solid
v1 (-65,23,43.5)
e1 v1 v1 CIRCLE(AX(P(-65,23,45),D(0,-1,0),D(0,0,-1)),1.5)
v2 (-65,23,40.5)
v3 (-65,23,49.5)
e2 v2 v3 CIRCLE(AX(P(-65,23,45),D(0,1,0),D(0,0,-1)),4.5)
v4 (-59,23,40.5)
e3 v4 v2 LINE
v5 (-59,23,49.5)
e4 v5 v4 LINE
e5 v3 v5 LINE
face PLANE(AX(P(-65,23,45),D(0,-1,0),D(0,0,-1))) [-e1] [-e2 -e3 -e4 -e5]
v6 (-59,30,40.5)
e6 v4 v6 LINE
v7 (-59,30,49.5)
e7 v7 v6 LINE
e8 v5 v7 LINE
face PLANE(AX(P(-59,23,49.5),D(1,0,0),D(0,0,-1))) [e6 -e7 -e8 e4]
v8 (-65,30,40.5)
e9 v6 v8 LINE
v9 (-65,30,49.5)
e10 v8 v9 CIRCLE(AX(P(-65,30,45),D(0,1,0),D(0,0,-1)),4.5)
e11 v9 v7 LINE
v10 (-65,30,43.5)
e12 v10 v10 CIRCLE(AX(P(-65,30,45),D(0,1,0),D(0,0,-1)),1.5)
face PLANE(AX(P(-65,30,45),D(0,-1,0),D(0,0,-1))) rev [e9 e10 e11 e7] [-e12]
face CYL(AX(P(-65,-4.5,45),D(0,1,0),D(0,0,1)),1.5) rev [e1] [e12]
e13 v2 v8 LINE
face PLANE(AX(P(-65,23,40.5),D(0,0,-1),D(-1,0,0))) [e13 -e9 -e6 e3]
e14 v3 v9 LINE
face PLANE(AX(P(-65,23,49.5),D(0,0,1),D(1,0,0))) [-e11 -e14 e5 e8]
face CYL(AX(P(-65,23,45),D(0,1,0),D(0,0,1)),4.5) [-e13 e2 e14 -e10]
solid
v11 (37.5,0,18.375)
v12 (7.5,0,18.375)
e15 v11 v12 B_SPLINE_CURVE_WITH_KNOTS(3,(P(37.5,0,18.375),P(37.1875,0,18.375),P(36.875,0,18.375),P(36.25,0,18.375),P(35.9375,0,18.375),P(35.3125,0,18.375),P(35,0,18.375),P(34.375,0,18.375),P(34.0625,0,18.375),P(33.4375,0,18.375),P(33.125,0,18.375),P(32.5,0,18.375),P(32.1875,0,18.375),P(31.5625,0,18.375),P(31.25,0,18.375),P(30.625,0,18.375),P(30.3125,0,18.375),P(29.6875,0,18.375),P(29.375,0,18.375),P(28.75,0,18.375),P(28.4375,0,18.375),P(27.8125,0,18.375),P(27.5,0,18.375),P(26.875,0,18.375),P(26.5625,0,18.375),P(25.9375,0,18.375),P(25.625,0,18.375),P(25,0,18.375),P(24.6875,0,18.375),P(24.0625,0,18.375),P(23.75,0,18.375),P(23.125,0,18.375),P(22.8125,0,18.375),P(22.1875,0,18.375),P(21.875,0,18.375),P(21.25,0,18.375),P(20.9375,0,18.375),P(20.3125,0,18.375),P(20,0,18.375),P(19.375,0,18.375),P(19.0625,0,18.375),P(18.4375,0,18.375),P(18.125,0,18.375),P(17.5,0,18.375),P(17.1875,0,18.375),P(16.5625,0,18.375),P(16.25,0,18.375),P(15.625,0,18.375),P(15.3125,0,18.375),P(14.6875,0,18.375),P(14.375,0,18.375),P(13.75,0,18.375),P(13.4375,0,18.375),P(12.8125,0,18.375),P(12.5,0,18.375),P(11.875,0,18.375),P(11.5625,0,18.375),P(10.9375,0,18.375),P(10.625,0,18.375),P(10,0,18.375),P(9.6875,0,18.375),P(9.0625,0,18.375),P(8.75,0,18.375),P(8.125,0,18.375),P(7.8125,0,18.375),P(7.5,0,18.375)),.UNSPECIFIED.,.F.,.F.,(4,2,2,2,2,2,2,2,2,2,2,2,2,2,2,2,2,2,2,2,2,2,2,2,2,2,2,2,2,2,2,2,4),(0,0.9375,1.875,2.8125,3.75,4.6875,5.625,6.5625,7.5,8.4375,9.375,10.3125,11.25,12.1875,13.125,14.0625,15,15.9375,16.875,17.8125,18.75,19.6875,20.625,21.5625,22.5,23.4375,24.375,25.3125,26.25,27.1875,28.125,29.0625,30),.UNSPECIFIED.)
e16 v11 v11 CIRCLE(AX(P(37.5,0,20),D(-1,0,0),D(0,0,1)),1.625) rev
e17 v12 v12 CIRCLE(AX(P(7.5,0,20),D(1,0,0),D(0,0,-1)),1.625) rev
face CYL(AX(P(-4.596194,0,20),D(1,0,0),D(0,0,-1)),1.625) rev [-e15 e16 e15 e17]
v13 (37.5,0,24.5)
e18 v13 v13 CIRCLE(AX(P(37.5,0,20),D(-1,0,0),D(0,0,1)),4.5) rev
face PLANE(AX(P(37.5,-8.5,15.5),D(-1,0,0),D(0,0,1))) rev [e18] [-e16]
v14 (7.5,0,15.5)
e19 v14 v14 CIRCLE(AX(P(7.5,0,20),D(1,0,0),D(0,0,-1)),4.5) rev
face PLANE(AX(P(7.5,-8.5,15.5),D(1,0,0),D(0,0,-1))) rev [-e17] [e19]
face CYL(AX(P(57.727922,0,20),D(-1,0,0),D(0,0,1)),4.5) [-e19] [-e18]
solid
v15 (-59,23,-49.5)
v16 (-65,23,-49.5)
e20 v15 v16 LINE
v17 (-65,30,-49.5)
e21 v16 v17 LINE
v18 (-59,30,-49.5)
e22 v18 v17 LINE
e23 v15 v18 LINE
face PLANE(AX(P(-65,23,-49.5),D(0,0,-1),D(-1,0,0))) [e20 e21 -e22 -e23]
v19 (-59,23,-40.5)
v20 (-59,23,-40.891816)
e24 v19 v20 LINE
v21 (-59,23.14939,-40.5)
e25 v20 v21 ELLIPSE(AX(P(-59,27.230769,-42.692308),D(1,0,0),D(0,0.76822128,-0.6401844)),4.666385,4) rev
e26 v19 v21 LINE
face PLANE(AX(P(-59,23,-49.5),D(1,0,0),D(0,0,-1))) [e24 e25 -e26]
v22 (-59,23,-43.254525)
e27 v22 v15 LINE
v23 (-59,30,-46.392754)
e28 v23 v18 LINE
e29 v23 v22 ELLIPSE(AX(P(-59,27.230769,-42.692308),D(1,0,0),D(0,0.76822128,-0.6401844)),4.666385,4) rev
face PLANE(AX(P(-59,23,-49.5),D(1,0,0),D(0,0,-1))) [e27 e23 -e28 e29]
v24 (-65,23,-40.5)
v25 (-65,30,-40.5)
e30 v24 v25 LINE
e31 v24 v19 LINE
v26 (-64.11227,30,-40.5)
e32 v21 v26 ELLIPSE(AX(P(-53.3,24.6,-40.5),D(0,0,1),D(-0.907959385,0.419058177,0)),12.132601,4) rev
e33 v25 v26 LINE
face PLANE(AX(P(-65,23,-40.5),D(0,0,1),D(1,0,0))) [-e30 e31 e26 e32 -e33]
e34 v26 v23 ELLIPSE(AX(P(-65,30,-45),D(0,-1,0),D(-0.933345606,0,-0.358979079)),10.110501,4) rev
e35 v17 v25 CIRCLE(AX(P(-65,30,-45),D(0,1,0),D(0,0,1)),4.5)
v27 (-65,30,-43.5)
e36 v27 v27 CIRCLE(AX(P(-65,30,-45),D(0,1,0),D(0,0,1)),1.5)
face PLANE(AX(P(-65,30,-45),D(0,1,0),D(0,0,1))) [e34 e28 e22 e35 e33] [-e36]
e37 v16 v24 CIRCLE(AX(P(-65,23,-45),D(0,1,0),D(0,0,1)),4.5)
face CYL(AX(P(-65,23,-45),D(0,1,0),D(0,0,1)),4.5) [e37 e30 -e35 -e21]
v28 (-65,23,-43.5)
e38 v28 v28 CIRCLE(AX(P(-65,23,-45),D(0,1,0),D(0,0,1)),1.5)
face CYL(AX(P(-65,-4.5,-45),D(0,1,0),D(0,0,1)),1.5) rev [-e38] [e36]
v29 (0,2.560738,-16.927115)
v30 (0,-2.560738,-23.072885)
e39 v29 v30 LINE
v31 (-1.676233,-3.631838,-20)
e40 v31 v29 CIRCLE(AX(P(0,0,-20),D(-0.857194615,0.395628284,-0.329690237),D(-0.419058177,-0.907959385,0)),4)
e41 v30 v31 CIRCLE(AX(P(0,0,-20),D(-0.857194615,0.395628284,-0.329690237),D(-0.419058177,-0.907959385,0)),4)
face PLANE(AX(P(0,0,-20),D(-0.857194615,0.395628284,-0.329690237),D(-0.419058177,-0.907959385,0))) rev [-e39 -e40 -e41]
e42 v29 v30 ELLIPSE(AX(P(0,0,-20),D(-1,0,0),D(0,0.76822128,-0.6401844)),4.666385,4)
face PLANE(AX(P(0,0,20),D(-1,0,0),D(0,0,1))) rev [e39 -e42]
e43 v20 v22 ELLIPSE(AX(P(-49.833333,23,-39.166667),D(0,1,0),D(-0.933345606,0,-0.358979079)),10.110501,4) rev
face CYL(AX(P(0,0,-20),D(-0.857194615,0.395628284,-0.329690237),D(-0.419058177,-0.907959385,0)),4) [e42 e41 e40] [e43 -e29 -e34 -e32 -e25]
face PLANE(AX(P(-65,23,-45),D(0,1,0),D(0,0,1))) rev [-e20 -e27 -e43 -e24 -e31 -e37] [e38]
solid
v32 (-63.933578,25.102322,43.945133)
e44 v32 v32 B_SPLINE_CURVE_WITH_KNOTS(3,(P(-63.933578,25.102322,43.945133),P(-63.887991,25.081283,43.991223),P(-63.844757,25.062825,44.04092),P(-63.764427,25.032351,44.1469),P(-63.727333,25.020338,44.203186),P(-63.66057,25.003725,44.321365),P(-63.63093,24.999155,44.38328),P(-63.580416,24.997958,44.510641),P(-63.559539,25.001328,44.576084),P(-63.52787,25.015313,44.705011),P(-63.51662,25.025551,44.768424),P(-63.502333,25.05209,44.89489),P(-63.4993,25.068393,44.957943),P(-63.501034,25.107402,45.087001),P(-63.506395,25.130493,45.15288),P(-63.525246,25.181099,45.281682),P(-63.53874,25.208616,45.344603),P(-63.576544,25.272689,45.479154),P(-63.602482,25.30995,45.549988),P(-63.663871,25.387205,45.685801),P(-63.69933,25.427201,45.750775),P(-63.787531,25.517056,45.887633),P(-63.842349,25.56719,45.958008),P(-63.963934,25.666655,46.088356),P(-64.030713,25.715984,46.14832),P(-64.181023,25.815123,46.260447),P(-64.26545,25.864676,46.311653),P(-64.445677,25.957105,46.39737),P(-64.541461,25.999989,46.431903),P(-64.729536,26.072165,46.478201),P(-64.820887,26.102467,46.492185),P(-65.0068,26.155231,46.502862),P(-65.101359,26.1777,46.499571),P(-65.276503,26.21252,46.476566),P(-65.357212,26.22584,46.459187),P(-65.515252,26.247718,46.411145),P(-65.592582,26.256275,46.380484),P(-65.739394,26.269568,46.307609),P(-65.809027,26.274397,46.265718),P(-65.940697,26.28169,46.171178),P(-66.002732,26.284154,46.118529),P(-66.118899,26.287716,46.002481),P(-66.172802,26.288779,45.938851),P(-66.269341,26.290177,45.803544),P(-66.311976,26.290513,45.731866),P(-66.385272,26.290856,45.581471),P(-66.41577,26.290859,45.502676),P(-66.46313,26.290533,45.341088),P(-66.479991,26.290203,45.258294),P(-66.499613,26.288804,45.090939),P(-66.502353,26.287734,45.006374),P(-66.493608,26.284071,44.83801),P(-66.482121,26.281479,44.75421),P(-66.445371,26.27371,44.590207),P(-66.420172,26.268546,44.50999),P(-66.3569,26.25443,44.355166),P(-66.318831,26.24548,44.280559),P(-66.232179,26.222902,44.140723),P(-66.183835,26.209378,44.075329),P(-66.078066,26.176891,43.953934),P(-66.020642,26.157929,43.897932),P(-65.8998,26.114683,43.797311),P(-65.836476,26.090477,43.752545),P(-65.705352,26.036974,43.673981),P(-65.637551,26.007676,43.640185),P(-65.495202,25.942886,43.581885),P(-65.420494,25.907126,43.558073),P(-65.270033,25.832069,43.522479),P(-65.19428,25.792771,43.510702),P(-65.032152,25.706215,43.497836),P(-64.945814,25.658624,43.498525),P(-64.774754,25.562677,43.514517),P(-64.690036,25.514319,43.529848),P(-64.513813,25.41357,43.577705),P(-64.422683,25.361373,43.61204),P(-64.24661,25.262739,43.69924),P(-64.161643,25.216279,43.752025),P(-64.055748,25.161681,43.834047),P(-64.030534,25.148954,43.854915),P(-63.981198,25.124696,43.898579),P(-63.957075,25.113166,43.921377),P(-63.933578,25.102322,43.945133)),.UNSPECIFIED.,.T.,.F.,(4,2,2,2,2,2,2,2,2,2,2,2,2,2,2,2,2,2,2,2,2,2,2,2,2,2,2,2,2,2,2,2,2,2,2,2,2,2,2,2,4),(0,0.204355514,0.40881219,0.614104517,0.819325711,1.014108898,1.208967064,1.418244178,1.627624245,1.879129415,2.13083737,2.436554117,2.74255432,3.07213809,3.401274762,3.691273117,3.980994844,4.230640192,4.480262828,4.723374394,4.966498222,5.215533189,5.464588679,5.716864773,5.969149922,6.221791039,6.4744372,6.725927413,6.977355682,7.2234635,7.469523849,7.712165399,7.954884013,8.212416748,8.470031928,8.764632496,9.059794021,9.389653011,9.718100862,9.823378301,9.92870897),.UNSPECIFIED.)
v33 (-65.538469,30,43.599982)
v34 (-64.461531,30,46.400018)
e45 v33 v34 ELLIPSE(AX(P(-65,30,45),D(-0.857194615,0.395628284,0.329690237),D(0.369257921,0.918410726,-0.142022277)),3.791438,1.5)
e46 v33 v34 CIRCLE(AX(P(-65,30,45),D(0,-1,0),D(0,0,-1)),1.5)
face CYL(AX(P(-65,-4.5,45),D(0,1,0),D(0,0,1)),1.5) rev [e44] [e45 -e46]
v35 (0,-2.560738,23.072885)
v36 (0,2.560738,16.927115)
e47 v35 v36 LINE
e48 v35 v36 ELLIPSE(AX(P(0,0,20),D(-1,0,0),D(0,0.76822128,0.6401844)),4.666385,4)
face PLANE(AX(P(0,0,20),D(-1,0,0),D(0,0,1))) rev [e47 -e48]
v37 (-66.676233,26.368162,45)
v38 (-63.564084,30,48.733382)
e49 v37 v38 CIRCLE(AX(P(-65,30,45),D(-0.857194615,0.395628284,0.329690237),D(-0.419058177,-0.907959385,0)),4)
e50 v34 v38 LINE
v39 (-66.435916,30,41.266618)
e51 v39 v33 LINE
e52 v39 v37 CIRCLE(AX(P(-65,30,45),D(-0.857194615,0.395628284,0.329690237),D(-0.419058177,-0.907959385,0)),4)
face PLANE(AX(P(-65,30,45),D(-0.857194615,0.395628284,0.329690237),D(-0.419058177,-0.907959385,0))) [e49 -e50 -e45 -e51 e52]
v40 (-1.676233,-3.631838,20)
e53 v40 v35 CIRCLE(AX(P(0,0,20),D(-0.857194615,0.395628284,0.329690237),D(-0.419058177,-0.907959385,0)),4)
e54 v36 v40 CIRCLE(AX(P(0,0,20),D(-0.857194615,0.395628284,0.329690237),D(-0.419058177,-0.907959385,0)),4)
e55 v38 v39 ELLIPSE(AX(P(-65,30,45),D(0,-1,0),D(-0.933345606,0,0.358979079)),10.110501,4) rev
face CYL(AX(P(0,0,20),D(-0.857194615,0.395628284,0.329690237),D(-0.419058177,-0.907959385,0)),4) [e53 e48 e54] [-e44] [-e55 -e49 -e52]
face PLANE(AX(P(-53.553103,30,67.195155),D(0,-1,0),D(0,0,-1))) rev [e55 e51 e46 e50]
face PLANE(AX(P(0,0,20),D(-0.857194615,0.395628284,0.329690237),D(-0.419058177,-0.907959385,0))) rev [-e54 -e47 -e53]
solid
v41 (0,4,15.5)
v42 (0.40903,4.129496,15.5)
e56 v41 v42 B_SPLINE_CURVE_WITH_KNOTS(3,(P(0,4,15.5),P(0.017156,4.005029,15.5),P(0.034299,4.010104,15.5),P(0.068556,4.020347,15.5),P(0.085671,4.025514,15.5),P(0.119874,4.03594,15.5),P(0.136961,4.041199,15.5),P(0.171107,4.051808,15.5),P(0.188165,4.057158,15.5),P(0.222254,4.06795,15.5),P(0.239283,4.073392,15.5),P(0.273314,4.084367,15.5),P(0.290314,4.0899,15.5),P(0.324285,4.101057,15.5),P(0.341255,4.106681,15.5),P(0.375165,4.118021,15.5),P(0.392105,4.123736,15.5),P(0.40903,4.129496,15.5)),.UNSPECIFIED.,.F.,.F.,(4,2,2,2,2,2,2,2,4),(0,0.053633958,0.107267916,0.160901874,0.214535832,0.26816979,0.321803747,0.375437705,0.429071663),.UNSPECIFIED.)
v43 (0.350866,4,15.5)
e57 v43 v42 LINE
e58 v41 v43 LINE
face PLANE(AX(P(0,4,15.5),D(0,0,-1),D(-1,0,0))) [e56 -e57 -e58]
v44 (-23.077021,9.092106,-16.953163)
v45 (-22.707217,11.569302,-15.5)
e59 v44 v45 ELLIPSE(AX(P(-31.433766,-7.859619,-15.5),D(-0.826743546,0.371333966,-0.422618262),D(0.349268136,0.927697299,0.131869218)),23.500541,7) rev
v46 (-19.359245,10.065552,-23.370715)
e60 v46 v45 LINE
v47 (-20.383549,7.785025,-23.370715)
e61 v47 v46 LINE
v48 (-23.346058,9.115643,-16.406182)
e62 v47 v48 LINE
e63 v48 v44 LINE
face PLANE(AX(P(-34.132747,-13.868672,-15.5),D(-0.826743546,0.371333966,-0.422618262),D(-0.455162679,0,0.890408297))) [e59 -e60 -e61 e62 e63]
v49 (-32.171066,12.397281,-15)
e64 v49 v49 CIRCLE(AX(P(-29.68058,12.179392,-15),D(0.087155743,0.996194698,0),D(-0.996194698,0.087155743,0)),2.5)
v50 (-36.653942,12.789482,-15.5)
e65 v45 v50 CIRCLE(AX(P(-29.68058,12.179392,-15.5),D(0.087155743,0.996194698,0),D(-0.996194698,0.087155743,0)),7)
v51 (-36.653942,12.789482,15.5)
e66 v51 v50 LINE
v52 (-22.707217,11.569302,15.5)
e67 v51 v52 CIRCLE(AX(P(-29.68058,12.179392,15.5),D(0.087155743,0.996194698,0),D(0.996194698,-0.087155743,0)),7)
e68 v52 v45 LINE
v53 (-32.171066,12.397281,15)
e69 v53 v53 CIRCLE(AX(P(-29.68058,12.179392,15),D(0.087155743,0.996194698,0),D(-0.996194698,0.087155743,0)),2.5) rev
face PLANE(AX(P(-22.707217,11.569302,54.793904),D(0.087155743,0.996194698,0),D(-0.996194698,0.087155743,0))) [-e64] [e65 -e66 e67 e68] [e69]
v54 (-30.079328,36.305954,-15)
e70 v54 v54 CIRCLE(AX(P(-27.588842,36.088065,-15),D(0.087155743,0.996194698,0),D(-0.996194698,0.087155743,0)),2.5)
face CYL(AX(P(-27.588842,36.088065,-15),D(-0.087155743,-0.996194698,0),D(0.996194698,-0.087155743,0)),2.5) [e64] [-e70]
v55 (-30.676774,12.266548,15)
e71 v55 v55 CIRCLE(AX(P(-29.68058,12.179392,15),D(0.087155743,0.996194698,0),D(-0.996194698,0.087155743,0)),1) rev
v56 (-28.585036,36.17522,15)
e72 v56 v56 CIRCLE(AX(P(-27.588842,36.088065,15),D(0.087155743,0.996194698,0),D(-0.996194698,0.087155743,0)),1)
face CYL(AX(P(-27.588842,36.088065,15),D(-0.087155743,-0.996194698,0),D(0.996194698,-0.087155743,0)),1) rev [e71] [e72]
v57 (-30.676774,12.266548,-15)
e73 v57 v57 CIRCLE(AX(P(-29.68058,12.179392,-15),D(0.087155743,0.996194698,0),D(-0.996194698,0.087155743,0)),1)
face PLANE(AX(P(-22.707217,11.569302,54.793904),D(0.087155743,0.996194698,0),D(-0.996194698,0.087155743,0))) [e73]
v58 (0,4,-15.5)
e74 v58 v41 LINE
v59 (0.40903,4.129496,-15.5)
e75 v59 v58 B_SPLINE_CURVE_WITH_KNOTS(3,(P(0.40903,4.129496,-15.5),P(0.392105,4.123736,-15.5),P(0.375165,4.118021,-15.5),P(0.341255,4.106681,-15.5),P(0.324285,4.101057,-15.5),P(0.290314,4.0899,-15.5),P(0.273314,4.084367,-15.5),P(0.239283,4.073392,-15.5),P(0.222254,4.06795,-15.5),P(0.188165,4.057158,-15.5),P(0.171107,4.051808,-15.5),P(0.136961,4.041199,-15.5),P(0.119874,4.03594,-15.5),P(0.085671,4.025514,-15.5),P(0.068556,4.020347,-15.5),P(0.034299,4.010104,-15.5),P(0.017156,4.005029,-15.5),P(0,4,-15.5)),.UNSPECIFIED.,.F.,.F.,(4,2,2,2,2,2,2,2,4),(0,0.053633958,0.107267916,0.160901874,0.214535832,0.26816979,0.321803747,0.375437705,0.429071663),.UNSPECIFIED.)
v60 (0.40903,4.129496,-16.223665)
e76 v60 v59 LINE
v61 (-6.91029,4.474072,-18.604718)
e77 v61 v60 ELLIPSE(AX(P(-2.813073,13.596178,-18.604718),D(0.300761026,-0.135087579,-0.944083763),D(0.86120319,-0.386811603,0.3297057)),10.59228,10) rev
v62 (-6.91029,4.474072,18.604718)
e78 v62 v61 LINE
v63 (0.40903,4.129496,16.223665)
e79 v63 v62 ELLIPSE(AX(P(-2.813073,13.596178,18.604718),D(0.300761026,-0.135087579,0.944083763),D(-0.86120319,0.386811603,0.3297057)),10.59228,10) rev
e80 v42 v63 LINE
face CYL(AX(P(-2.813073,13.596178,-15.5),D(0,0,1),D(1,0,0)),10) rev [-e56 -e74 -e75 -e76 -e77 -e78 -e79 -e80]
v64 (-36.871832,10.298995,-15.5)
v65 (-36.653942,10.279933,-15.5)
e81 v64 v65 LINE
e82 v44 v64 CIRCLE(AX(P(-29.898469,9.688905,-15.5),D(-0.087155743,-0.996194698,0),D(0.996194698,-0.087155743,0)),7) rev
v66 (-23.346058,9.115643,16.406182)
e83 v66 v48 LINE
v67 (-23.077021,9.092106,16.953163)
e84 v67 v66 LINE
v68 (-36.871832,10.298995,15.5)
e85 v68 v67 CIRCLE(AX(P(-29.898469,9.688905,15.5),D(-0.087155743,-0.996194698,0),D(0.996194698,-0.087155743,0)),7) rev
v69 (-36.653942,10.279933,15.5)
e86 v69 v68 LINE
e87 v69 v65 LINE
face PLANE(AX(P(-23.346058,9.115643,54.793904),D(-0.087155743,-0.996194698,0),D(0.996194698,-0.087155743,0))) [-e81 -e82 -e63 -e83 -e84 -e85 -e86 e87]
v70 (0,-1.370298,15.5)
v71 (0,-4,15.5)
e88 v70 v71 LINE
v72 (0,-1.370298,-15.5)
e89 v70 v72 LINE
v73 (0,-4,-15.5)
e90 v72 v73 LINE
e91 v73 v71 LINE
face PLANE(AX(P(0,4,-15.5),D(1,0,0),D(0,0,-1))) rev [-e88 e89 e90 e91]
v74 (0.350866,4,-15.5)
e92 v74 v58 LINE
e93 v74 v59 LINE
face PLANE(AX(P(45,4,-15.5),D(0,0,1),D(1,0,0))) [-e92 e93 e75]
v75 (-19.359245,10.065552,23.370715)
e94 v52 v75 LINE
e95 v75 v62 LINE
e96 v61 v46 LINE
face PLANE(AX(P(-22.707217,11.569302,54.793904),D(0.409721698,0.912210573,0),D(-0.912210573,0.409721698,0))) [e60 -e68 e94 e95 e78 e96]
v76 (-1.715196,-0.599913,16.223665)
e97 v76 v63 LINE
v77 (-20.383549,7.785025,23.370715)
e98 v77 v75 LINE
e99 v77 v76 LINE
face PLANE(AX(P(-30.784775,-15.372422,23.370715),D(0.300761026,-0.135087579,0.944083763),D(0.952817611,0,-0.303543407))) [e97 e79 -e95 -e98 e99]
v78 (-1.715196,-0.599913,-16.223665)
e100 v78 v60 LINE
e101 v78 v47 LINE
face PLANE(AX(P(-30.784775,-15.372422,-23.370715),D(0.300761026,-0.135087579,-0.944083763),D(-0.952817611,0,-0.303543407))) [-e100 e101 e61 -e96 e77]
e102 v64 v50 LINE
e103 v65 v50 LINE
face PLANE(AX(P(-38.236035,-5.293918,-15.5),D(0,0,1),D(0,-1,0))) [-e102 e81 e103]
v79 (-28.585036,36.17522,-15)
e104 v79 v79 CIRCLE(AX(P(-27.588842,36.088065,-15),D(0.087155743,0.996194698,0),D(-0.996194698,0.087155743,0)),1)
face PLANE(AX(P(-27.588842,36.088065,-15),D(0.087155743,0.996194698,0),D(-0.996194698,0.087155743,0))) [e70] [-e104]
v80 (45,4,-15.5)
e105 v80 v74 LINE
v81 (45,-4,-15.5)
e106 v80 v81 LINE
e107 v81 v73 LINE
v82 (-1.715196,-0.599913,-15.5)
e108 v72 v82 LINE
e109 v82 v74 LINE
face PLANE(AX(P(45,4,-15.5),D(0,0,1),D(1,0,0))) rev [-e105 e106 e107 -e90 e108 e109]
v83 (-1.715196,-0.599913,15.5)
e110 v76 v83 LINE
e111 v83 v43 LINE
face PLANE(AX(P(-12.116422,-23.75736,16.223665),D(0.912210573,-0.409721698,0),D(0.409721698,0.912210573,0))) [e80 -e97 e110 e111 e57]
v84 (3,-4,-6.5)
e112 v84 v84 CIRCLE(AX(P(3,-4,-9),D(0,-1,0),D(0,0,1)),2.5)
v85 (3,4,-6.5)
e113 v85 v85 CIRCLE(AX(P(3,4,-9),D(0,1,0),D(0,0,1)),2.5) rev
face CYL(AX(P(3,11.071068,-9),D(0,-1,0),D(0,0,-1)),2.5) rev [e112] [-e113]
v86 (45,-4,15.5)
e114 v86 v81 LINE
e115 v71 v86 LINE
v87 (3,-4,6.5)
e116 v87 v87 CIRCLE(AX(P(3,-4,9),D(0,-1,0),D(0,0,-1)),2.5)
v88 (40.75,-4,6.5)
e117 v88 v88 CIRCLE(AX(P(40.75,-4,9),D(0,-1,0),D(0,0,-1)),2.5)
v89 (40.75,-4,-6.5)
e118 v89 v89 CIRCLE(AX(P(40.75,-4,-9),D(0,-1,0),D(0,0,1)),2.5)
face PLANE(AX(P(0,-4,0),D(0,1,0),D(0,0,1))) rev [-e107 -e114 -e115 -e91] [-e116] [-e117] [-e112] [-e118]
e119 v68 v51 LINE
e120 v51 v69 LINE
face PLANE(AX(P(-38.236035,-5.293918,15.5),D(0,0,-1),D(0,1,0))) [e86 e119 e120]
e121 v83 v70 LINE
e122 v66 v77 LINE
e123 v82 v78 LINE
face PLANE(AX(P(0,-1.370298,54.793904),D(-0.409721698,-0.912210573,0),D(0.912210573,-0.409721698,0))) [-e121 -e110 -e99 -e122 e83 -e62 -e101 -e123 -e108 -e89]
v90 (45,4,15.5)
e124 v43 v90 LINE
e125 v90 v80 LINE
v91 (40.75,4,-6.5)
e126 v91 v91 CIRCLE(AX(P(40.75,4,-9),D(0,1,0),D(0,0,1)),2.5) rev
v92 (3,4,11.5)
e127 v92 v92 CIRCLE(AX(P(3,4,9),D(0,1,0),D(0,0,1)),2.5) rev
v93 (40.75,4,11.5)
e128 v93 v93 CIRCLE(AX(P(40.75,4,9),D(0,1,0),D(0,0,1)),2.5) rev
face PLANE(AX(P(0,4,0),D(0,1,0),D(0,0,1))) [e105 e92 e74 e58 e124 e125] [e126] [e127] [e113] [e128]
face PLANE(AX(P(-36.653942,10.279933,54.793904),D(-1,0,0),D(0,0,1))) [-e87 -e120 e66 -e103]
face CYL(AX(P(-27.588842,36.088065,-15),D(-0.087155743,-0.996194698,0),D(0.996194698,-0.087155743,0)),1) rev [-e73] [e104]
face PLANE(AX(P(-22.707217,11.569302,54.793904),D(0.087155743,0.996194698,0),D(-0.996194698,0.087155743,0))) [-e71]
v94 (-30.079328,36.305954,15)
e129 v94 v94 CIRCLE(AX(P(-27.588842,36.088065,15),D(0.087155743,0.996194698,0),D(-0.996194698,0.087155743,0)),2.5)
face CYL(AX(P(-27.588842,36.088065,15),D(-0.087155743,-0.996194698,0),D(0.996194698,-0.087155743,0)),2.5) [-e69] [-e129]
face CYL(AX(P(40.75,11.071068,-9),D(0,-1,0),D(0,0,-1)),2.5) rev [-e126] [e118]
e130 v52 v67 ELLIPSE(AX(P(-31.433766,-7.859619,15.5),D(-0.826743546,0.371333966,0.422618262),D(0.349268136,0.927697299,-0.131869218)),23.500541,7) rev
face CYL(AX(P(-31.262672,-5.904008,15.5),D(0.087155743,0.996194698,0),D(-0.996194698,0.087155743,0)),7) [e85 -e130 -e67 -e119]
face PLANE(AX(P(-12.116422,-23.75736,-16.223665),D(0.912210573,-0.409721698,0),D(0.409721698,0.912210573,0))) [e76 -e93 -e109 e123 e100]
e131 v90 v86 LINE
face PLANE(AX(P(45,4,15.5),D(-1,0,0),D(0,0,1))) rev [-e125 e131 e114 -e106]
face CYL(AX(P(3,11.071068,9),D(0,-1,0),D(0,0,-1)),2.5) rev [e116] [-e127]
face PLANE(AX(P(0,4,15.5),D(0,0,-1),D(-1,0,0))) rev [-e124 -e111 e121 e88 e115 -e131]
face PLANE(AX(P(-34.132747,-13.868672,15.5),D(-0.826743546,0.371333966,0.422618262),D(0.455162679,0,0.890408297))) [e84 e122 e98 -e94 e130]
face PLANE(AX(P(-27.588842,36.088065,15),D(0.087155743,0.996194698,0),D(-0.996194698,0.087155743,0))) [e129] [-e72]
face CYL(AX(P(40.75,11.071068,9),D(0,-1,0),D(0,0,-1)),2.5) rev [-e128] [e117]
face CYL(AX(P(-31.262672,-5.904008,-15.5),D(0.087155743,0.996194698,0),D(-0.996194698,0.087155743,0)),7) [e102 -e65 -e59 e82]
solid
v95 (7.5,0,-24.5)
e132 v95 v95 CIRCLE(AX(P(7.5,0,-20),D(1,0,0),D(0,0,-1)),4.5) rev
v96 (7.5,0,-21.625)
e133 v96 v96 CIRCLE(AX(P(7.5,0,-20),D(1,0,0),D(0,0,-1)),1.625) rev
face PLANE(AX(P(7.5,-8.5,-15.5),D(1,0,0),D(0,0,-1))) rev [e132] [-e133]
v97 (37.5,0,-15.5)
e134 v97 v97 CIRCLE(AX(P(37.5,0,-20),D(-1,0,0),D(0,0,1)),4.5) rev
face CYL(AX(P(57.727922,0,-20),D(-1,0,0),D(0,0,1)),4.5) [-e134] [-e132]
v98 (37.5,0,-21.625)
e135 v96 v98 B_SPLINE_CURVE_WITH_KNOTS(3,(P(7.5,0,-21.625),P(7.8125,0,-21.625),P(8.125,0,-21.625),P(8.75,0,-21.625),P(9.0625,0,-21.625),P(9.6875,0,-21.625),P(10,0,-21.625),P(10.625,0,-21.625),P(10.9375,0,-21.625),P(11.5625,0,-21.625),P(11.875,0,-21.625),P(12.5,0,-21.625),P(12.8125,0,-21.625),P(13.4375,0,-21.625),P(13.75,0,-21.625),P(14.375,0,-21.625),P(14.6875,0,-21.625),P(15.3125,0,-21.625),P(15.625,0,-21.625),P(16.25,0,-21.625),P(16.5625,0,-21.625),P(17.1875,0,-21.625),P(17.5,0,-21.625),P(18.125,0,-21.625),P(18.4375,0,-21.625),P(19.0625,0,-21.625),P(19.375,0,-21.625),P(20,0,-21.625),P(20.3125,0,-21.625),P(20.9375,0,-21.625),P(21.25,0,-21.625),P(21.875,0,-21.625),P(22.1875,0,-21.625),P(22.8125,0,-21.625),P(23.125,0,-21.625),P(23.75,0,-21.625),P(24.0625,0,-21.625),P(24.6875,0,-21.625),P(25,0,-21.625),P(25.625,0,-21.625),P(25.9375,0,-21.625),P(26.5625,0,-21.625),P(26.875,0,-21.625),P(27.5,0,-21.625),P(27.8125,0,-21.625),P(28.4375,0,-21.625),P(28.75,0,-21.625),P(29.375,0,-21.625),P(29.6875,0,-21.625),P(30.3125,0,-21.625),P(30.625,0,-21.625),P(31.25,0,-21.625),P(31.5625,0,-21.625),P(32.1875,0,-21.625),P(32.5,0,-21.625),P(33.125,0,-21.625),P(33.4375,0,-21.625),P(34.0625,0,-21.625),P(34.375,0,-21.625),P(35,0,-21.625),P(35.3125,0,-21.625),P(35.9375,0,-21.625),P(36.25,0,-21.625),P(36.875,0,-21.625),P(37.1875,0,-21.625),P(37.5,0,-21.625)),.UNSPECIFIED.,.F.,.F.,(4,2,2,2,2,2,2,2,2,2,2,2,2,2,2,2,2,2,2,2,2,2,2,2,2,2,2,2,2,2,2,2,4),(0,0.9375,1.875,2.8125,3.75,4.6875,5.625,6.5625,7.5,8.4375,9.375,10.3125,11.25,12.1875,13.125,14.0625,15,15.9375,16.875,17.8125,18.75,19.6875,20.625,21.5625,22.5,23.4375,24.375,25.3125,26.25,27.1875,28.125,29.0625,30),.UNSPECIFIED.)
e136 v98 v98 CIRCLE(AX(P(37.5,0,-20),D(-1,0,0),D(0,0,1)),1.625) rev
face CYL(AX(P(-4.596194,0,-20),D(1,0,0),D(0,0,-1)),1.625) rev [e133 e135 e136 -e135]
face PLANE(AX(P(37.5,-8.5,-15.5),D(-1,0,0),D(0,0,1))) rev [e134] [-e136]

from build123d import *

# Parameters (mm, degrees)
SKETCH97_W                       = 45
SKETCH97_H                       = 31
BASE_DEPTH                       = 4
SKETCH98_R                       = 4.5
CYLINDERS_DEPTH                  = 45
CYLINDERS_2_DEPTH                = 45
ARM_1_PROFILE_R                  = 4
ARM_2_PROFILE_R                  = 4
ARM_PLATFORMS_DEPTH              = 7
POST_CONNECTOR_DEPTH             = 31
SKETCH128_R                      = 2.5
SKETCH128_R_2                    = 1
POSTS_DEPTH                      = 24
POST_PLATFORMS_DEPTH             = 2.5
SKETCH130_W                      = 16.362853456
SKETCH130_H                      = 6.736136134
ARM_TRIM_DEPTH                   = 99
SKETCH131_R                      = 1.5
ARM_HOLES_DEPTH                  = 93.036677509
SKETCH132_R                      = 1.625
SUSPENSION_ARM_ATTACHMENTS_DEPTH = 45
SKETCH134_W                      = 7.5
SKETCH134_H                      = 9
SUSPENSION_ARM_SLOTS_DEPTH       = 12.5
BOSS_EXTRUDE7_REACH              = 94.675
FILLET1_START                    = -18.604718507
FILLET1_DEPTH                    = 37.209437014
FILLET1_START_2                  = -15.5
FILLET1_2_DEPTH                  = 31
FILLET1_START_3                  = -17.995855857
FILLET1_3_DEPTH                  = 2.495855857
FILLET1_START_4                  = 15.5
FILLET1_4_DEPTH                  = 2.481792954
FILLET1_START_5                  = 1.25
FILLET1_5_DEPTH                  = 3.75
SKETCH137_R                      = 2.5
CUT_EXTRUDE6_DEPTH               = 8


with BuildPart() as part:
    # Sketch97 → Base (new, symmetric)
    with BuildSketch(Plane(origin=(0, 0, 0), x_dir=(1, 0, 0), z_dir=(0, 1, 0))):
        with Locations((22.5, 0)):
            Rectangle(SKETCH97_W, SKETCH97_H)
    extrude(amount=BASE_DEPTH, both=True)

    # Sketch127 → Post Connector (add)
    with BuildSketch(Plane(origin=(0, 0, -15.5), x_dir=(-1, 0, 0), z_dir=(0, 0, -1))):
        Polygon((0, -1.370297645), (23.346057588, 9.115643475), (36.653942412, 10.279932533), (36.653942412, 12.789482127), (22.707216639, 11.569301728), (0, 1.370297645), align=None)
    extrude(amount=-POST_CONNECTOR_DEPTH)

    # Sketch128 → Posts (add)
    # profile 1 of 2: a face of its own
    with BuildSketch(Plane(origin=(0.832007259, 9.509886489, 0), x_dir=(0.9961946980917455, -0.08715574274765821, 0), z_dir=(0.08715574274765821, 0.9961946980917455, 0))):
        with Locations(Location((-30.62913991, 15, 0), (0, 0, 11.536959033))):
            Circle(SKETCH128_R)
        with Locations(Location((-30.62913991, 15, 0), (0, 0, 30))):
            Circle(SKETCH128_R_2, mode=Mode.SUBTRACT)
    # profile 2 of 2: a face of its own
    with BuildSketch(Plane(origin=(0.832007259, 9.509886489, 0), x_dir=(0.9961946980917455, -0.08715574274765821, 0), z_dir=(0.08715574274765821, 0.9961946980917455, 0))):
        with Locations(Location((-30.62913991, -15, 0), (0, 0, 348.463040967))):
            Circle(SKETCH128_R)
        with Locations(Location((-30.62913991, -15, 0), (0, 0, 330))):
            Circle(SKETCH128_R_2, mode=Mode.SUBTRACT)
    extrude(amount=POSTS_DEPTH)

    # Sketch129 → Post Platforms (add)
    with BuildSketch(Plane(origin=(0.832007259, 9.509886489, 0), x_dir=(0.9961946980917455, -0.08715574274765821, 0), z_dir=(0.08715574274765821, 0.9961946980917455, 0))):
        with BuildLine():
            Line((-37.62913991, 15.5), (-23.62913991, 15.5))
            ThreePointArc((-23.62913991, 15.5), (-30.62913991, 22.5), (-37.62913991, 15.5))
        make_face()
        with BuildLine():
            Line((-37.62913991, -15.5), (-23.62913991, -15.5))
            ThreePointArc((-23.62913991, -15.5), (-30.62913991, -22.5), (-37.62913991, -15.5))
        make_face()
    extrude(amount=-POST_PLATFORMS_DEPTH)

    # Boss-Extrude7: up to this face of the body (flat: up to its plane)
    boss_extrude7_end = Plane(part.part.faces().sort_by_distance((-11.673028794, 3.872672915, 0))[0])
    # Sketch135 → Boss-Extrude7 (add, up to the picked face)
    with BuildSketch(Plane(origin=(0.512152123, 1.140263217, 0), x_dir=(0.9122105733011601, -0.40972169817763965, 0), z_dir=(0.40972169817763965, 0.9122105733011601, 0)), mode=Mode.PRIVATE) as boss_extrude7_sk1:
        Polygon((-25.453957059, 15.5), (-21.783782411, 23.370714932), (-1.318822801, 16.223664949), (-1.318822801, 15.5), align=None)
    boss_extrude7_tool1 = split(extrude(boss_extrude7_sk1.sketch, amount=-BOSS_EXTRUDE7_REACH, mode=Mode.PRIVATE), bisect_by=boss_extrude7_end, keep=Keep.BOTH, mode=Mode.PRIVATE)
    # Sketch135 → Boss-Extrude7 (add, up to the picked face)
    with BuildSketch(Plane(origin=(0.512152123, 1.140263217, 0), x_dir=(0.9122105733011601, -0.40972169817763965, 0), z_dir=(0.40972169817763965, 0.9122105733011601, 0)), mode=Mode.PRIVATE) as boss_extrude7_sk2:
        Polygon((-1.318822801, -15.5), (-25.453957059, -15.5), (-21.783782411, -23.370714932), (-1.318822801, -16.223664949), align=None)
    boss_extrude7_tool2 = split(extrude(boss_extrude7_sk2.sketch, amount=-BOSS_EXTRUDE7_REACH, mode=Mode.PRIVATE), bisect_by=boss_extrude7_end, keep=Keep.BOTH, mode=Mode.PRIVATE)
    add(boss_extrude7_tool1.solids().sort_by(Axis((-13.721683, 7.533427, -18.141018), (-0.40972169817763965, -0.9122105733011601, 0)))[0])
    add(boss_extrude7_tool2.solids().sort_by(Axis((-13.721683, 7.533427, 18.141018), (-0.40972169817763965, -0.9122105733011601, 0)))[0])

    # Fillet1: read off the stored shape, not the designer's step
    # Fillet1 outline → Fillet1 (add)
    with BuildSketch(Plane.XY.offset(FILLET1_START)):
        with BuildLine():
            Line((-6.910289561, 4.47407177), (-0.690891981, 1.680613535))
            Line((-0.690891981, 1.680613535), (0, 3.218825869))
            Line((0, 3.218825869), (0, 4))
            ThreePointArc((0, 4), (-3.497501335, 3.619627133), (-6.910289561, 4.47407177))
        make_face()
    extrude(amount=FILLET1_DEPTH)

    # Fillet1 2 outline → Fillet1 2 (add)
    with BuildSketch(Plane.XY.offset(FILLET1_START_2)):
        Polygon((0, 3.218825869), (-0.690891981, 1.680613535), (0, 1.370297645), align=None)
    extrude(amount=FILLET1_2_DEPTH)

    # Fillet1 3 outline → Fillet1 3 (add)
    with BuildSketch(Plane.XY.offset(FILLET1_START_3)):
        with BuildLine():
            Line((0, 4), (0, 3.218825869))
            Line((0, 3.218825869), (0.409029873, 4.129496152))
            ThreePointArc((0.409029873, 4.129496152), (0.205209503, 4.0625542), (0, 4))
        make_face()
    extrude(amount=FILLET1_3_DEPTH)

    # Fillet1 4 outline → Fillet1 4 (add)
    with BuildSketch(Plane.XY.offset(FILLET1_START_4)):
        with BuildLine():
            Line((0, 4), (0, 3.218825869))
            Line((0, 3.218825869), (0.409029873, 4.129496152))
            ThreePointArc((0.409029873, 4.129496152), (0.205209503, 4.0625542), (0, 4))
        make_face()
    extrude(amount=FILLET1_4_DEPTH)

    # Fillet1 5 outline → Fillet1 5 (cut)
    with BuildSketch(Plane(origin=(0, 0, 0), x_dir=(0.9122105733011605, -0.4097216981776387, 0), z_dir=(0.4097216981776387, 0.9122105733011606, 0)).offset(FILLET1_START_5)):
        Polygon((-8.136763516, 18.604718418), (-1.318822801, 16.223664949), (-1.318822802, 17.995855857), (-1.318822802, 18.604718507), align=None)
        Polygon((-1.318822801, -16.223664949), (-8.136763516, -18.604718418), (-1.318822801, -18.604718507), (-1.318822802, -17.981792954), align=None)
    extrude(amount=FILLET1_5_DEPTH, mode=Mode.SUBTRACT)

    # Sketch137 → Cut-Extrude6 (cut)
    with BuildSketch(Plane.XZ.offset(4)):
        with Locations(Location((3, 9, 0), (0, 0, 270))):
            Circle(SKETCH137_R)
        with Locations(Location((40.75, 9, 0), (0, 0, 270))):
            Circle(SKETCH137_R)
        with Locations(Location((40.75, -9, 0), (0, 0, 90))):
            Circle(SKETCH137_R)
        with Locations(Location((3, -9, 0), (0, 0, 90))):
            Circle(SKETCH137_R)
    extrude(amount=-CUT_EXTRUDE6_DEPTH, mode=Mode.SUBTRACT)


with BuildPart() as body_2:
    # Sketch98 → Cylinders (new body)
    with BuildSketch(Plane.ZY):
        with Locations((-20, 0)):
            Circle(SKETCH98_R)
    extrude(amount=-CYLINDERS_DEPTH)

    # Arm 2: sweep along a curve in space
    with BuildLine() as arm_2_path:
        Line((0, 0, -20), (-65, 30, -45))
    # Arm 2 profile (on start of the path) → Arm 2 (sweep)
    with BuildSketch(Plane(origin=(0, 0, -20), x_dir=(-0.41905817746174673, -0.9079593845004517, 0), z_dir=(-0.8571946154145232, 0.39562828403747213, -0.3296902366978935))):
        Circle(ARM_2_PROFILE_R)
    sweep(path=arm_2_path.line)

    # Sketch126 → Arm Platforms (add)
    with BuildSketch(Plane(origin=(0, 30, 0), x_dir=(1, 0, 0), z_dir=(0, 1, 0))):
        with BuildLine():
            Line((-59, -49.5), (-59, -40.5))
            Line((-59, -40.5), (-65, -40.5))
            ThreePointArc((-65, -40.5), (-69.5, -45), (-65, -49.5))
            Line((-65, -49.5), (-59, -49.5))
        make_face()
        with BuildLine():
            Line((-65, 49.5), (-59, 49.5))
            Line((-59, 49.5), (-59, 40.5))
            Line((-59, 40.5), (-65, 40.5))
            ThreePointArc((-65, 40.5), (-69.5, 45), (-65, 49.5))
        make_face()
    extrude(amount=-ARM_PLATFORMS_DEPTH)


with BuildPart() as body_3:
    # Sketch98 → Cylinders 2 (new body)
    with BuildSketch(Plane.ZY):
        with Locations((20, 0)):
            Circle(SKETCH98_R)
    extrude(amount=-CYLINDERS_2_DEPTH)

    # Arm 1: sweep along a curve in space
    with BuildLine() as arm_1_path:
        Line((0, 0, 20), (-65, 30, 45))
    # Arm 1 profile (on start of the path) → Arm 1 (sweep)
    with BuildSketch(Plane(origin=(0, 0, 20), x_dir=(-0.4190581774617468, -0.9079593845004517, 0), z_dir=(-0.8571946154145231, 0.39562828403747213, 0.32969023669789366))):
        Circle(ARM_1_PROFILE_R)
    sweep(path=arm_1_path.line)


with BuildPart() as arm_platforms_piece_1:
    # of the separate pieces the step leaves, piece 1, a body of its own (arm_platforms_pieces)
    add(body_2.part.solids().sort_by_distance((0, 0, -15.5))[0])


with BuildPart() as arm_platforms_piece_2:
    # of the separate pieces the step leaves, piece 2, a body of its own (arm_platforms_pieces)
    add(body_2.part.solids().sort_by_distance((-65, 30, 49.5))[0])


with BuildPart() as arm_trim_tool:
    # Sketch130 → Arm Trim (new body)
    with BuildSketch(Plane(origin=(0, 0, -49.5), x_dir=(-1, 0, 0), z_dir=(0, 0, -1))):
        with Locations((61.734530152, 33.368068067)):
            Rectangle(SKETCH130_W, SKETCH130_H)
    extrude(amount=-ARM_TRIM_DEPTH)


with BuildPart() as body_3_1:
    add(body_3.part)

    # Arm Trim: cut by arm_trim_tool
    add(arm_trim_tool.part, mode=Mode.SUBTRACT)


with BuildPart() as arm_platforms_piece_1_1:
    add(arm_platforms_piece_1.part)

    # Arm Trim: cut by arm_trim_tool
    add(arm_trim_tool.part, mode=Mode.SUBTRACT)


with BuildPart() as arm_holes_tool:
    # Sketch131 → Arm holes (new, through all)
    with BuildSketch(Plane(origin=(0, 30, 0), x_dir=(1, 0, 0), z_dir=(0, 1, 0))):
        with Locations(Location((-65, 45, 0), (0, 0, 270))):
            Circle(SKETCH131_R)
        with Locations(Location((-65, -45, 0), (0, 0, 90))):
            Circle(SKETCH131_R)
    extrude(amount=-ARM_HOLES_DEPTH)


with BuildPart() as body_3_2:
    add(body_3_1.part)

    # Arm holes: cut by arm_holes_tool
    add(arm_holes_tool.part, mode=Mode.SUBTRACT)


with BuildPart() as arm_platforms_piece_1_2:
    add(arm_platforms_piece_1_1.part)

    # Arm holes: cut by arm_holes_tool
    add(arm_holes_tool.part, mode=Mode.SUBTRACT)


with BuildPart() as arm_platforms_piece_2_1:
    add(arm_platforms_piece_2.part)

    # Arm holes: cut by arm_holes_tool
    add(arm_holes_tool.part, mode=Mode.SUBTRACT)


with BuildPart() as suspension_arm_attachments_tool:
    # Sketch132 → Suspension Arm Attachments (new body)
    with BuildSketch(Plane(origin=(45, 0, 0), x_dir=(0, 0, -1), z_dir=(1, 0, 0))):
        with Locations((-20, 0)):
            Circle(SKETCH132_R)
        with Locations((20, 0)):
            Circle(SKETCH132_R)
    extrude(amount=-SUSPENSION_ARM_ATTACHMENTS_DEPTH)


with BuildPart() as body_3_3:
    add(body_3_2.part)

    # Suspension Arm Attachments: cut by suspension_arm_attachments_tool
    add(suspension_arm_attachments_tool.part, mode=Mode.SUBTRACT)


with BuildPart() as arm_platforms_piece_1_3:
    add(arm_platforms_piece_1_2.part)

    # Suspension Arm Attachments: cut by suspension_arm_attachments_tool
    add(suspension_arm_attachments_tool.part, mode=Mode.SUBTRACT)


with BuildPart() as suspension_arm_slots_tool:
    # Sketch134 → Suspension Arm slots (new, symmetric)
    with BuildSketch(Plane(origin=(0, 4, 0), x_dir=(1, 0, 0), z_dir=(0, 1, 0))):
        with Locations((3.75, 20)):
            Rectangle(SKETCH134_W, SKETCH134_H)
        with Locations((41.25, 20)):
            Rectangle(SKETCH134_W, SKETCH134_H)
        with Locations((41.25, -20)):
            Rectangle(SKETCH134_W, SKETCH134_H)
        with Locations((3.75, -20)):
            Rectangle(SKETCH134_W, SKETCH134_H)
    extrude(amount=SUSPENSION_ARM_SLOTS_DEPTH, both=True)


with BuildPart() as body_3_4:
    add(body_3_3.part)

    # Suspension Arm slots: cut by suspension_arm_slots_tool
    add(suspension_arm_slots_tool.part, mode=Mode.SUBTRACT)


with BuildPart() as arm_platforms_piece_1_4:
    add(arm_platforms_piece_1_3.part)

    # Suspension Arm slots: cut by suspension_arm_slots_tool
    add(suspension_arm_slots_tool.part, mode=Mode.SUBTRACT)


with BuildPart() as suspension_arm_slots_piece_1:
    # of the separate pieces the step leaves, piece 1, a body of its own (suspension_arm_slots_pieces)
    add(body_3_4.part.solids().sort_by_distance((0, -2.560737599, 23.072885118))[0])


with BuildPart() as suspension_arm_slots_piece_2:
    # of the separate pieces the step leaves, piece 2, a body of its own (suspension_arm_slots_pieces)
    add(body_3_4.part.solids().sort_by_distance((7.5, 0, 24.5))[0])


with BuildPart() as suspension_arm_slots_piece_1_of_arm_plat:
    # of the separate pieces the step leaves, piece 1, a body of its own (suspension_arm_slots_pieces_of_arm_platf)
    add(arm_platforms_piece_1_4.part.solids().sort_by_distance((0, 2.560737599, -16.927114882))[0])


with BuildPart() as suspension_arm_slots_piece_2_of_arm_plat:
    # of the separate pieces the step leaves, piece 2, a body of its own (suspension_arm_slots_pieces_of_arm_platf)
    add(arm_platforms_piece_1_4.part.solids().sort_by_distance((7.5, 0, -15.5))[0])


solid = Compound([part.part, arm_platforms_piece_2_1.part, suspension_arm_slots_piece_1.part, suspension_arm_slots_piece_2.part, suspension_arm_slots_piece_1_of_arm_plat.part, suspension_arm_slots_piece_2_of_arm_plat.part])
